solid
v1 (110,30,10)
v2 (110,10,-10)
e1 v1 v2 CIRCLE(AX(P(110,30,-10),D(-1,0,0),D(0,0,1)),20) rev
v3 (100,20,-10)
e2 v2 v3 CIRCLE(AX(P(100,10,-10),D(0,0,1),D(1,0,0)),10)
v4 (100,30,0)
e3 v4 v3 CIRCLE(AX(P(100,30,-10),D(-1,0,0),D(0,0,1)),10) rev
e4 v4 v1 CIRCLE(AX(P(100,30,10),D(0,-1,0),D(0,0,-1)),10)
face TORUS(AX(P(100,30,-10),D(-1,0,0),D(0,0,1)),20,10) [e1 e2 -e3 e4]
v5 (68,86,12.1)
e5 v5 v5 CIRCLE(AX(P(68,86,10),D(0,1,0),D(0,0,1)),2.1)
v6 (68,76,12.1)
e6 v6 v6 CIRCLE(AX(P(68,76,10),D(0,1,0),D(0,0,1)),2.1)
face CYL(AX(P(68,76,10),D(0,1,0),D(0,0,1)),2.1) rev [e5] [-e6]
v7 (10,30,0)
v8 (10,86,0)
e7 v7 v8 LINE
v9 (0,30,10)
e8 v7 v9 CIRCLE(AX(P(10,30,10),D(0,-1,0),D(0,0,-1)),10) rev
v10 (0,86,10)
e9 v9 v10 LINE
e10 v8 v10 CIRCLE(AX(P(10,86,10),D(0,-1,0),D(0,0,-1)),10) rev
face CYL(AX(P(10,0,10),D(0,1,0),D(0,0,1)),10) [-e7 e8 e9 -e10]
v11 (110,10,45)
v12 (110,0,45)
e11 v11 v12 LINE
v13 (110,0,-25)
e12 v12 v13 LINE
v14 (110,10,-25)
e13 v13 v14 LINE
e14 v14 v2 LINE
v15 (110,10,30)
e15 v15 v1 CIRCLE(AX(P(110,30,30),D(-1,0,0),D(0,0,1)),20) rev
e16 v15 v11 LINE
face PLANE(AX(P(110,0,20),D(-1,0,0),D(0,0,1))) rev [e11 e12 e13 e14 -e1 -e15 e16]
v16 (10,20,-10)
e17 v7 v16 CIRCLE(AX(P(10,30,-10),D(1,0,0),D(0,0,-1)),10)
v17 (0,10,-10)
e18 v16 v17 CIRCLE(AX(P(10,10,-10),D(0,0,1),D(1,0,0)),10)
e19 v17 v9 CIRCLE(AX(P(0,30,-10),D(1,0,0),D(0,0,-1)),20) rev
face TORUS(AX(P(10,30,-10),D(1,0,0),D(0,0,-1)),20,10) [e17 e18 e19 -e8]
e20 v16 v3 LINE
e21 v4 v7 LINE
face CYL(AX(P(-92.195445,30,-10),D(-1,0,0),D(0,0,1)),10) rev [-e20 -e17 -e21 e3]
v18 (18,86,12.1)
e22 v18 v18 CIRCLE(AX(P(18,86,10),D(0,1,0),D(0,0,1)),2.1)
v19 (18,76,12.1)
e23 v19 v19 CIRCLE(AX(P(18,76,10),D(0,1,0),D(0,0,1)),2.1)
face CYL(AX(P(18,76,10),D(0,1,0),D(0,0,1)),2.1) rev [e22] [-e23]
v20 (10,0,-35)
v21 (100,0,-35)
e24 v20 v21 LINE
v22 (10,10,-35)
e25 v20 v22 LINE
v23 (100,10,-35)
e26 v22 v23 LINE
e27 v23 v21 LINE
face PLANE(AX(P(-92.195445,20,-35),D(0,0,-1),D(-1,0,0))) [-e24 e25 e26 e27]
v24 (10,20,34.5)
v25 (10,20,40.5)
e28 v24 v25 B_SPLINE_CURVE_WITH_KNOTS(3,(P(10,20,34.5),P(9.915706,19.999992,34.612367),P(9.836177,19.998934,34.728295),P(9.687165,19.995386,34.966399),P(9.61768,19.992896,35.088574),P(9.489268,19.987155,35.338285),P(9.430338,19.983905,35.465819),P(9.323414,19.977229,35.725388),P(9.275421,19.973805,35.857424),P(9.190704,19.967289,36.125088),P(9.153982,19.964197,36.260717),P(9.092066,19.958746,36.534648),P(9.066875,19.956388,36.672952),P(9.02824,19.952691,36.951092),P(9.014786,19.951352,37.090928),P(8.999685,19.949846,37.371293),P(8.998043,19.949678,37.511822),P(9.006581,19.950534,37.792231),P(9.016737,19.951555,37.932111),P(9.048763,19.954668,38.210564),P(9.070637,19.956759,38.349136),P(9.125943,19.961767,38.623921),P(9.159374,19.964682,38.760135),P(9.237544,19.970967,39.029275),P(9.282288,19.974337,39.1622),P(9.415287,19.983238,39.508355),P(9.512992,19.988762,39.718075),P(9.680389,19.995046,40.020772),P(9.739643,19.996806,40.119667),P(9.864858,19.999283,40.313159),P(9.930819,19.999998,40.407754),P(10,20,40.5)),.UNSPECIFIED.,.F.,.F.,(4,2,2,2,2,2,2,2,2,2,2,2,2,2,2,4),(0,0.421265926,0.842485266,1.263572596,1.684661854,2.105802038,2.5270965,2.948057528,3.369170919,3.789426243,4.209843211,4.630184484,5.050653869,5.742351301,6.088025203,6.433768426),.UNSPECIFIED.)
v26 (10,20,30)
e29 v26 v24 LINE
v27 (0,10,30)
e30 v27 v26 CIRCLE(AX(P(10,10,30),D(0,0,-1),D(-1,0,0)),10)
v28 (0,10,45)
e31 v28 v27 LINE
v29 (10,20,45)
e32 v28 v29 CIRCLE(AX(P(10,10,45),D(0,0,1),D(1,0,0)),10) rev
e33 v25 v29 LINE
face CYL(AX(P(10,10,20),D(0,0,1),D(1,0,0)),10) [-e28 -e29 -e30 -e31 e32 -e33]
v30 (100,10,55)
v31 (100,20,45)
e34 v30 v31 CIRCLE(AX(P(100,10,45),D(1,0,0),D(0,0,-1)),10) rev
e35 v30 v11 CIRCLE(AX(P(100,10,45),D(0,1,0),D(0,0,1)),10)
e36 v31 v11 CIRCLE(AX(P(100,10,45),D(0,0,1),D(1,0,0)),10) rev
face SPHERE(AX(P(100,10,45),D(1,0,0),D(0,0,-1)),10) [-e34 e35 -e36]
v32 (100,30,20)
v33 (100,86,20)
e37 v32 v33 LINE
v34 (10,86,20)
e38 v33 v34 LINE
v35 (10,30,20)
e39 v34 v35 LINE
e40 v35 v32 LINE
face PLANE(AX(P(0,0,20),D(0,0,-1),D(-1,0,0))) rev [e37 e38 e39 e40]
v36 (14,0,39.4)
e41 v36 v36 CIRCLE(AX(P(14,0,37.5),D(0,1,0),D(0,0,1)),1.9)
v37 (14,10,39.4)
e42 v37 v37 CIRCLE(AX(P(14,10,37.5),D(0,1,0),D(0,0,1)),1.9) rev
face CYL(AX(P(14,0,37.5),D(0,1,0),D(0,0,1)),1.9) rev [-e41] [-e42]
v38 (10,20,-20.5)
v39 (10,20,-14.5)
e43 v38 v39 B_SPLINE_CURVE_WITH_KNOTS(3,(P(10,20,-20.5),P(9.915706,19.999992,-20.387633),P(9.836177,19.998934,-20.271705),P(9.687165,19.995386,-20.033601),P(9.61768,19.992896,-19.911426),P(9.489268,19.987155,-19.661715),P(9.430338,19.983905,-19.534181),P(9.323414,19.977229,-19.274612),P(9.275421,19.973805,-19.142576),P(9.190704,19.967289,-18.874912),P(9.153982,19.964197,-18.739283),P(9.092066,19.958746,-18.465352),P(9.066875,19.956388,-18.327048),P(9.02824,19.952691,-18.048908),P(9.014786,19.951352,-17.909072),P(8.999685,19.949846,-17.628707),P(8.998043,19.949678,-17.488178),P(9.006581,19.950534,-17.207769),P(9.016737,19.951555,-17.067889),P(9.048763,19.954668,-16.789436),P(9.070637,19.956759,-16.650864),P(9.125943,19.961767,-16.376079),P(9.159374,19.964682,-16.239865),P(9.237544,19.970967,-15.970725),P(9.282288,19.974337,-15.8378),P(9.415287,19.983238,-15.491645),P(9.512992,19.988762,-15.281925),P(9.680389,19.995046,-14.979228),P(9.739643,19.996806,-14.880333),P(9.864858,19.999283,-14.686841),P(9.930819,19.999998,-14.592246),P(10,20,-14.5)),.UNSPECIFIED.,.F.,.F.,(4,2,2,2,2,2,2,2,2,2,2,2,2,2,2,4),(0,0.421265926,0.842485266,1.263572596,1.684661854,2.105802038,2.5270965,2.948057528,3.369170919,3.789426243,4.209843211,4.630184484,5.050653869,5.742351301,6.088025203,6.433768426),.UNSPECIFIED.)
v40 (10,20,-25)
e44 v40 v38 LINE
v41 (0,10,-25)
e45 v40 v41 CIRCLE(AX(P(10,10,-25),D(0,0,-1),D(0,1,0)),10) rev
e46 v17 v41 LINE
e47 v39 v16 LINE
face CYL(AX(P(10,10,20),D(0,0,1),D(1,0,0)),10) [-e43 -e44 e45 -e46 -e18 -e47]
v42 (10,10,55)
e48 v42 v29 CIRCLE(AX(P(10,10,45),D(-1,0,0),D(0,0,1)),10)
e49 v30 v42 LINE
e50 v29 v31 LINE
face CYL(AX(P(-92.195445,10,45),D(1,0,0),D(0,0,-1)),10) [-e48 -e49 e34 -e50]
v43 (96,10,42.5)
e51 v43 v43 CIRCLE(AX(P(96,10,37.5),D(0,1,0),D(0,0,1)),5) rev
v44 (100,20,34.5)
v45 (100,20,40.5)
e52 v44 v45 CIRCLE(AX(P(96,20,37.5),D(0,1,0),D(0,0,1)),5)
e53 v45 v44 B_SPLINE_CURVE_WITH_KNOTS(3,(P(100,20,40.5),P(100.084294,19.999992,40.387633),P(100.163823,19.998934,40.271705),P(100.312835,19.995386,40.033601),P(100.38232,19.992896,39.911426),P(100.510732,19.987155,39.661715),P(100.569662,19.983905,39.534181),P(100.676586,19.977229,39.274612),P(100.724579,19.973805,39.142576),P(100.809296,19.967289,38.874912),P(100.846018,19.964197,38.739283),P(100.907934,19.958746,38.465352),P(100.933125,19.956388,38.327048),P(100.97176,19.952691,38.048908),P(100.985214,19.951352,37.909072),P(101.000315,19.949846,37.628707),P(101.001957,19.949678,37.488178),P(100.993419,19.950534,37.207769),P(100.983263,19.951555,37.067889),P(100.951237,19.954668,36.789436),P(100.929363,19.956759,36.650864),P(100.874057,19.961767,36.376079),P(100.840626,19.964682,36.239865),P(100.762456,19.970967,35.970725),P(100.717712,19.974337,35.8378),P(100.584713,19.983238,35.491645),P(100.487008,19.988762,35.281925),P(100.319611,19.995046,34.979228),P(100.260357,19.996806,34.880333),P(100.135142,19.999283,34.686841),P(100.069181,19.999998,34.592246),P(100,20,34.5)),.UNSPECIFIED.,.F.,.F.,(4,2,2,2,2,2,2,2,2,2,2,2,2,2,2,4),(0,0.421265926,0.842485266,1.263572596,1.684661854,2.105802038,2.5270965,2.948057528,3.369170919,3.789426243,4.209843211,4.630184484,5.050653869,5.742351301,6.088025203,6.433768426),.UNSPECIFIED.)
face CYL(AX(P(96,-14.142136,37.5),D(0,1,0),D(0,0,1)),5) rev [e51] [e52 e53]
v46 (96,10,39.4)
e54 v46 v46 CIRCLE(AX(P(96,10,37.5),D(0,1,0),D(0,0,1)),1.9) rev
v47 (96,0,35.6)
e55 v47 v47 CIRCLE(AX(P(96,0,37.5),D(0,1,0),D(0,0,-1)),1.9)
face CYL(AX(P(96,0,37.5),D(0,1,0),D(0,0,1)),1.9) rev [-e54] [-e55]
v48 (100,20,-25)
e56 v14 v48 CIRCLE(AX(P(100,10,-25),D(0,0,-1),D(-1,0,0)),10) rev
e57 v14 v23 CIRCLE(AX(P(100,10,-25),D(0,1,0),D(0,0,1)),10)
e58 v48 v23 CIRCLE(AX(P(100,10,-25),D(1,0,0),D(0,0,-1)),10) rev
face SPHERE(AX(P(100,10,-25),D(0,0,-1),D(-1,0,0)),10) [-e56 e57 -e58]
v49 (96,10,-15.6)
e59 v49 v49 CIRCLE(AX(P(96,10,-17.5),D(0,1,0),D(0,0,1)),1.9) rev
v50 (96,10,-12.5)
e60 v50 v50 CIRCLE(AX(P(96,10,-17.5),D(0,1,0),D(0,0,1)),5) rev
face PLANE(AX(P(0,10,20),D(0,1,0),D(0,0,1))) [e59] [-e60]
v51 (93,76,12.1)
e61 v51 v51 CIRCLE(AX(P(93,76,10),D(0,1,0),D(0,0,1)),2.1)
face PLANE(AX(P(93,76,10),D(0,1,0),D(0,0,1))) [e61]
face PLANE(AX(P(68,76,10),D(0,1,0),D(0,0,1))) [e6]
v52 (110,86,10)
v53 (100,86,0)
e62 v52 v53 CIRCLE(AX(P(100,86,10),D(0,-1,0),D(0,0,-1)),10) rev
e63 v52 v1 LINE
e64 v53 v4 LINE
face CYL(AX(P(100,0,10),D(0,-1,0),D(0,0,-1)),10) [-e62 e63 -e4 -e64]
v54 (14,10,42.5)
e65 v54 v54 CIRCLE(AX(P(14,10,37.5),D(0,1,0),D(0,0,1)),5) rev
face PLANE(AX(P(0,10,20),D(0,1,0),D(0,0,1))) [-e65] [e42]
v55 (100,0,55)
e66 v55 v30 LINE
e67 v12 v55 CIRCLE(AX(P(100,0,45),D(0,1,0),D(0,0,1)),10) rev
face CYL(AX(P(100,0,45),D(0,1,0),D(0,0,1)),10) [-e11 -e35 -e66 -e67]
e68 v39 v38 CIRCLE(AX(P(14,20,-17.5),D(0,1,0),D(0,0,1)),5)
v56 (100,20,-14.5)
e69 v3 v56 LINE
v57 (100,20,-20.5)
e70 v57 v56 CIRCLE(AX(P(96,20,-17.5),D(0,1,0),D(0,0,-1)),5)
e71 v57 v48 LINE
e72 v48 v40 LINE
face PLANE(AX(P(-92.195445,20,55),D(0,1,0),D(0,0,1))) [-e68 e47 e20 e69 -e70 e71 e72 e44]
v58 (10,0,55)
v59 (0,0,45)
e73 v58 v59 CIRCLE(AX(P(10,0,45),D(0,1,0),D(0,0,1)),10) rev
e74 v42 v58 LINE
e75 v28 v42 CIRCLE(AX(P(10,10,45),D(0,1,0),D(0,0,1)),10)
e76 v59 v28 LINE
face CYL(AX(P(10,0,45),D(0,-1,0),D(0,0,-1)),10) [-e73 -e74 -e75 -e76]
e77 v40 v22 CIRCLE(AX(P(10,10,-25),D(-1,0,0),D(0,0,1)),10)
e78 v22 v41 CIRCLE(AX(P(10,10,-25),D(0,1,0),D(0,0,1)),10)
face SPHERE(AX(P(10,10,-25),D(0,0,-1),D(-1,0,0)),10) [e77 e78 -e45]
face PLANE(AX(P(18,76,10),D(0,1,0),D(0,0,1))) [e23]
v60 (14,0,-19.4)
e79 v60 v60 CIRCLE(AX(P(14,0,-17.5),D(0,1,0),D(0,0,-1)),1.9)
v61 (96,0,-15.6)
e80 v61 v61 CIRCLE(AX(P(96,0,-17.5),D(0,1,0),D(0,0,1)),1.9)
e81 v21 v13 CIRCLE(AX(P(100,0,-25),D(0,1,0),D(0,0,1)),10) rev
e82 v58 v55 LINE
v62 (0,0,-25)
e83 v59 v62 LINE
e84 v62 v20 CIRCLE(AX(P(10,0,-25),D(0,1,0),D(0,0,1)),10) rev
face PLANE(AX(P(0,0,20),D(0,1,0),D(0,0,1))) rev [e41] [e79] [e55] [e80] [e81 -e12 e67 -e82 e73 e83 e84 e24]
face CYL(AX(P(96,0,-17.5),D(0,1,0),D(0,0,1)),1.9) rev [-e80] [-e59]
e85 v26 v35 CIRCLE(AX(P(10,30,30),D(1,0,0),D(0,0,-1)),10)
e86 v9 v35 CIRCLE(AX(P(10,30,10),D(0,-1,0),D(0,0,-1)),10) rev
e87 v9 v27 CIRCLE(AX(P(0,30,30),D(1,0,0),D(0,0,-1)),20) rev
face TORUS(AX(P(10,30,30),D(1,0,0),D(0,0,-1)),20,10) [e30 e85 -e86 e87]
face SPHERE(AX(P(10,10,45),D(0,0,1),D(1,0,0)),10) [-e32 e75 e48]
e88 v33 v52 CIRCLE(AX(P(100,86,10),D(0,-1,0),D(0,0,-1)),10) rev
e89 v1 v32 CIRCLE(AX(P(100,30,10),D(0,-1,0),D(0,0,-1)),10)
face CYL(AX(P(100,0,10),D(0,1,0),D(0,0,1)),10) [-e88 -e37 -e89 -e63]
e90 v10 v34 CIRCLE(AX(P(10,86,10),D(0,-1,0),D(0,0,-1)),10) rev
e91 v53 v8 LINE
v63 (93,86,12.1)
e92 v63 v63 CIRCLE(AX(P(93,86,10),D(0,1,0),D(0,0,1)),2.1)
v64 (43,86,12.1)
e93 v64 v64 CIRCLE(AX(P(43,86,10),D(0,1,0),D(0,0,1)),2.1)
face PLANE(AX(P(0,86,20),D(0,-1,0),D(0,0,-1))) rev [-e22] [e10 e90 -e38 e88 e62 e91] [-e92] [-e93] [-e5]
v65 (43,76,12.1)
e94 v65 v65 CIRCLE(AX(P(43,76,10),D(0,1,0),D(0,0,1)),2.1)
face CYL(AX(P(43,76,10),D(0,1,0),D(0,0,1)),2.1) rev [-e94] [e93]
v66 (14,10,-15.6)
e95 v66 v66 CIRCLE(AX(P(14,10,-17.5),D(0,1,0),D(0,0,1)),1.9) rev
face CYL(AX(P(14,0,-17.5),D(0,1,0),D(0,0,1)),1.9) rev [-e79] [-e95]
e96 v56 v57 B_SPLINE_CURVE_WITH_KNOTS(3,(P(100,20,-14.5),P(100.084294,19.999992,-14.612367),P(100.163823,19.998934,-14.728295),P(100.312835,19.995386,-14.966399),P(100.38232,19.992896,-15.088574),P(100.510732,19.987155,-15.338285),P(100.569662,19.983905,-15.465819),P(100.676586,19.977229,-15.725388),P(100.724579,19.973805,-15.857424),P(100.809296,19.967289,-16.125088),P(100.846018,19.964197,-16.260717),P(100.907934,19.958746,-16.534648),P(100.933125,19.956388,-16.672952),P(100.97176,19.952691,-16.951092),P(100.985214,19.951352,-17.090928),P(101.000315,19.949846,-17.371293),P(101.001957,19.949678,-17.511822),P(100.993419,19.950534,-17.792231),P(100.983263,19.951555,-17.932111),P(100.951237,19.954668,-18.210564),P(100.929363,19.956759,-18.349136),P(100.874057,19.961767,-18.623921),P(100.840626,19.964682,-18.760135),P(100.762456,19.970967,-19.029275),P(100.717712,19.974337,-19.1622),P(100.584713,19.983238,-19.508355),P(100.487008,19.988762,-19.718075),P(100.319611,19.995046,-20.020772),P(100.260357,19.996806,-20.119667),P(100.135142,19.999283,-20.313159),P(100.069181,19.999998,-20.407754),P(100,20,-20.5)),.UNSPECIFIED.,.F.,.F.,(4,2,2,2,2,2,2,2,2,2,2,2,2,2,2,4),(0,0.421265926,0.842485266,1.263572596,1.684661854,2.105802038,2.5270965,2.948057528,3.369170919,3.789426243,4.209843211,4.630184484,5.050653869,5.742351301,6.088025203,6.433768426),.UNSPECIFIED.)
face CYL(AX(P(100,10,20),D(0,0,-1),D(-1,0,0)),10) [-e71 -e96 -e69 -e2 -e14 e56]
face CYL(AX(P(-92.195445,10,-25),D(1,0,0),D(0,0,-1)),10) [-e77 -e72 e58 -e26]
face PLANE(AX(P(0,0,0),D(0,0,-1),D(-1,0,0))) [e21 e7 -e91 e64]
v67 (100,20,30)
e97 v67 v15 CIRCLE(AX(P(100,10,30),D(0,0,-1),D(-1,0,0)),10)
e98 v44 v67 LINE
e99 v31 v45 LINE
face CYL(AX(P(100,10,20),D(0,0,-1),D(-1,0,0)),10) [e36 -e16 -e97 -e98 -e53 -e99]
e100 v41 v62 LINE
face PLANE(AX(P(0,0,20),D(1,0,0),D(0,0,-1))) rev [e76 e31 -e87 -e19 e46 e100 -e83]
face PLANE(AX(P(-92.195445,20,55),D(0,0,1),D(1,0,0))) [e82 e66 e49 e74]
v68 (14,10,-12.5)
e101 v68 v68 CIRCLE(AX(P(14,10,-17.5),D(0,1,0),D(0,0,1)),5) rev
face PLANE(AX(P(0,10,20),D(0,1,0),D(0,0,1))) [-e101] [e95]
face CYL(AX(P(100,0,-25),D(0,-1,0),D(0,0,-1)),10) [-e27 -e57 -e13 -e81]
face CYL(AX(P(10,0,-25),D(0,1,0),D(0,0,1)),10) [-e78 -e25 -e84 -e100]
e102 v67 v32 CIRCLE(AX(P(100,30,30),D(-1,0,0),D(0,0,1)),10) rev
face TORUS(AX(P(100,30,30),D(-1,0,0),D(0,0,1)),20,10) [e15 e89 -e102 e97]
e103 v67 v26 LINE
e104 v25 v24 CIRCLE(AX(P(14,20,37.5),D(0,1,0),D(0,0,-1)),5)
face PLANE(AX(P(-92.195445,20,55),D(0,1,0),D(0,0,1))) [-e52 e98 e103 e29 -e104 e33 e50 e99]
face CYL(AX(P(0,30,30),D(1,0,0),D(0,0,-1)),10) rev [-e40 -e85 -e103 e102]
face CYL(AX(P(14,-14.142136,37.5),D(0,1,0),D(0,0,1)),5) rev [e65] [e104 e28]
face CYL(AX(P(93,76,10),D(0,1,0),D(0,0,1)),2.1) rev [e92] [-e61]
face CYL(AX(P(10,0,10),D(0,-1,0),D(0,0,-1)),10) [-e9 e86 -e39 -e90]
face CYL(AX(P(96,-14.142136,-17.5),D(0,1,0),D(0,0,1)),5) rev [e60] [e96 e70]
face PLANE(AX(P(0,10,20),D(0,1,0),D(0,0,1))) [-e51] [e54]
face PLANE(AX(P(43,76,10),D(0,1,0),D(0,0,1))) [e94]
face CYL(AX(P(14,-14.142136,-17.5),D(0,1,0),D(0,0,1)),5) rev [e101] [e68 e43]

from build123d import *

# Parameters (mm, degrees)
SKETCH2_W           = 110
SKETCH2_H           = 86
BOSS_EXTRUDE1_DEPTH = 20
SKETCH3_W           = 90
SKETCH3_H           = 20
BOSS_EXTRUDE2_DEPTH = 110
SKETCH4_R           = 1.9
CUT_EXTRUDE1_DEPTH  = 20
SKETCH5_R           = 5
CUT_EXTRUDE2_DEPTH  = 10
FILLET1_R           = 10
SKETCH6_R           = 2.1
CUT_EXTRUDE3_DEPTH  = 10


with BuildPart() as part:
    # Sketch2 → Boss-Extrude1 (new body)
    with BuildSketch(Plane.XY):
        with Locations((55, 43)):
            Rectangle(SKETCH2_W, SKETCH2_H)
    extrude(amount=BOSS_EXTRUDE1_DEPTH)

    # Sketch3 → Boss-Extrude2 (add)
    with BuildSketch(Plane(origin=(110, 0, 0), x_dir=(0, 0, -1), z_dir=(1, 0, 0))):
        with Locations((-10, 10)):
            Rectangle(SKETCH3_W, SKETCH3_H)
    extrude(amount=-BOSS_EXTRUDE2_DEPTH)

    # Sketch4 → Cut-Extrude1 (cut)
    with BuildSketch(Plane(origin=(0, 20, 0), x_dir=(1, 0, 0), z_dir=(0, 1, 0))):
        with Locations(Location((14, -37.5, 0), (0, 0, 270))):
            Circle(SKETCH4_R)
        with Locations(Location((96, -37.5, 0), (0, 0, 90))):
            Circle(SKETCH4_R)
        with Locations(Location((96, 17.5, 0), (0, 0, 270))):
            Circle(SKETCH4_R)
        with Locations(Location((14, 17.5, 0), (0, 0, 90))):
            Circle(SKETCH4_R)
    extrude(amount=-CUT_EXTRUDE1_DEPTH, mode=Mode.SUBTRACT)

    # Sketch5 → Cut-Extrude2 (cut)
    with BuildSketch(Plane(origin=(0, 20, 0), x_dir=(1, 0, 0), z_dir=(0, 1, 0))):
        with Locations(Location((96, -37.5, 0), (0, 0, 270))):
            Circle(SKETCH5_R)
        with Locations(Location((14, -37.5, 0), (0, 0, 270))):
            Circle(SKETCH5_R)
        with Locations(Location((14, 17.5, 0), (0, 0, 270))):
            Circle(SKETCH5_R)
        with Locations(Location((96, 17.5, 0), (0, 0, 270))):
            Circle(SKETCH5_R)
    extrude(amount=-CUT_EXTRUDE2_DEPTH, mode=Mode.SUBTRACT)

    # Fillet1
    # the kernel refuses this fillet: 10 mm, written as the material it adds along each edge
    with BuildSketch(Plane(origin=(0, 20, 0), x_dir=(0, 0, -1), z_dir=(1, 0, 0)), Plane(origin=(0, 20, 20), x_dir=(0, 1, 0), z_dir=(1, 0, 0))) as fillet1_piece_1:
        with BuildLine():
            CenterArc((FILLET1_R, FILLET1_R), FILLET1_R, 180, 90)
            Line((0, FILLET1_R), (0, 0))
            Line((0, 0), (FILLET1_R, 0))
        make_face()
    extrude(amount=110)
    # the kernel refuses this fillet: 10 mm, written as the material it takes off along each edge
    with BuildSketch(Plane(origin=(0, 45, -35), x_dir=(0, 0, 1), z_dir=(0, -1, 0)), Plane(origin=(110, 45, -35), x_dir=(-1, 0, 0), z_dir=(0, -1, 0)), Plane(origin=(0, -25, 55), x_dir=(0, 0, -1), z_dir=(0, 1, 0)), Plane(origin=(110, -25, 55), x_dir=(-1, 0, 0), z_dir=(0, 1, 0))) as fillet1_2_piece_1:
        with BuildLine():
            CenterArc((FILLET1_R, -FILLET1_R), FILLET1_R, 90, 90)
            Line((0, -FILLET1_R), (0, 0))
            Line((0, 0), (FILLET1_R, 0))
        make_face()
    extrude(amount=70, mode=Mode.SUBTRACT)
    with BuildSketch(Plane(origin=(135, 20, -35), x_dir=(0, -1, 0), z_dir=(-1, 0, 0))) as fillet1_2_piece_2:
        with BuildLine():
            CenterArc((FILLET1_R, FILLET1_R), FILLET1_R, 180, 90)
            Line((0, FILLET1_R), (0, 0))
            Line((0, 0), (FILLET1_R, 0))
        make_face()
    extrude(amount=160, mode=Mode.SUBTRACT)
    with BuildSketch(Plane(origin=(135, 20, 55), x_dir=(0, -1, 0), z_dir=(-1, 0, 0))) as fillet1_2_piece_3:
        with BuildLine():
            CenterArc((FILLET1_R, -FILLET1_R), FILLET1_R, 90, 90)
            Line((0, -FILLET1_R), (0, 0))
            Line((0, 0), (FILLET1_R, 0))
        make_face()
    extrude(amount=160, mode=Mode.SUBTRACT)
    # the kernel refuses this fillet: 10 mm, written as the material it takes off along each edge
    with BuildSketch(Plane(origin=(100, 10, 45), x_dir=(0, 1, 0), z_dir=(1, 0, 0))) as fillet1_3_piece_1_section:
        Polygon((0, 0), (FILLET1_R, 0), (FILLET1_R, FILLET1_R), (0, FILLET1_R), align=None)
    fillet1_3_piece_1 = extrude(amount=FILLET1_R, mode=Mode.PRIVATE)
    fillet1_3_piece_1 = fillet1_3_piece_1 - Plane(origin=(100, 10, 45), x_dir=(0, -0.7071067811865475, -0.7071067811865475), z_dir=(1, 0, 0)) * Sphere(FILLET1_R, mode=Mode.PRIVATE)
    add(fillet1_3_piece_1, mode=Mode.SUBTRACT)
    with BuildSketch(Plane(origin=(10, 10, 45), x_dir=(0, 1, 0), z_dir=(-1, 0, 0))) as fillet1_3_piece_2_section:
        Polygon((0, 0), (FILLET1_R, 0), (FILLET1_R, -FILLET1_R), (0, -FILLET1_R), align=None)
    fillet1_3_piece_2 = extrude(amount=FILLET1_R, mode=Mode.PRIVATE)
    fillet1_3_piece_2 = fillet1_3_piece_2 - Plane(origin=(10, 10, 45), x_dir=(0, -0.7071067811865475, -0.7071067811865475), z_dir=(-1, 0, 0)) * Sphere(FILLET1_R, mode=Mode.PRIVATE)
    add(fillet1_3_piece_2, mode=Mode.SUBTRACT)
    with BuildSketch(Plane(origin=(10, 10, -25), x_dir=(0, 1, 0), z_dir=(-1, 0, 0))) as fillet1_3_piece_3_section:
        Polygon((0, 0), (FILLET1_R, 0), (FILLET1_R, FILLET1_R), (0, FILLET1_R), align=None)
    fillet1_3_piece_3 = extrude(amount=FILLET1_R, mode=Mode.PRIVATE)
    fillet1_3_piece_3 = fillet1_3_piece_3 - Plane(origin=(10, 10, -25), x_dir=(0, -0.7071067811865475, 0.7071067811865475), z_dir=(-1, 0, 0)) * Sphere(FILLET1_R, mode=Mode.PRIVATE)
    add(fillet1_3_piece_3, mode=Mode.SUBTRACT)
    with BuildSketch(Plane(origin=(100, 10, -25), x_dir=(0, 1, 0), z_dir=(1, 0, 0))) as fillet1_3_piece_4_section:
        Polygon((0, 0), (FILLET1_R, 0), (FILLET1_R, -FILLET1_R), (0, -FILLET1_R), align=None)
    fillet1_3_piece_4 = extrude(amount=FILLET1_R, mode=Mode.PRIVATE)
    fillet1_3_piece_4 = fillet1_3_piece_4 - Plane(origin=(100, 10, -25), x_dir=(0, -0.7071067811865475, 0.7071067811865475), z_dir=(1, 0, 0)) * Sphere(FILLET1_R, mode=Mode.PRIVATE)
    add(fillet1_3_piece_4, mode=Mode.SUBTRACT)
    with BuildSketch(Plane(origin=(0, 111, 0), x_dir=(0, 0, 1), z_dir=(0, -1, 0)), Plane(origin=(110, 30, 0), x_dir=(0, 0, 1), z_dir=(0, 1, 0))) as fillet1_3_piece_5:
        with BuildLine():
            CenterArc((FILLET1_R, -FILLET1_R), FILLET1_R, 90, 90)
            Line((0, -FILLET1_R), (0, 0))
            Line((0, 0), (FILLET1_R, 0))
        make_face()
    extrude(amount=81, mode=Mode.SUBTRACT)
    with BuildSketch(Plane(origin=(0, 111, 20), x_dir=(0, 0, -1), z_dir=(0, -1, 0)), Plane(origin=(110, 30, 20), x_dir=(0, 0, -1), z_dir=(0, 1, 0))) as fillet1_3_piece_6:
        with BuildLine():
            CenterArc((FILLET1_R, FILLET1_R), FILLET1_R, 180, 90)
            Line((0, FILLET1_R), (0, 0))
            Line((0, 0), (FILLET1_R, 0))
        make_face()
    extrude(amount=81, mode=Mode.SUBTRACT)
    with BuildSketch(Plane(origin=(110, 20, -10), x_dir=(0, -1, 0), z_dir=(0, 0, -1)), Plane(origin=(110, 20, 45), x_dir=(0, -1, 0), z_dir=(0, 0, -1))) as fillet1_3_piece_7:
        with BuildLine():
            CenterArc((FILLET1_R, FILLET1_R), FILLET1_R, 180, 90)
            Line((0, FILLET1_R), (0, 0))
            Line((0, 0), (FILLET1_R, 0))
        make_face()
    extrude(amount=15, mode=Mode.SUBTRACT)
    with BuildSketch(Plane(origin=(0, 20, -10), x_dir=(0, -1, 0), z_dir=(0, 0, -1)), Plane(origin=(0, 20, 45), x_dir=(0, -1, 0), z_dir=(0, 0, -1))) as fillet1_3_piece_8:
        with BuildLine():
            CenterArc((FILLET1_R, -FILLET1_R), FILLET1_R, 90, 90)
            Line((0, -FILLET1_R), (0, 0))
            Line((0, 0), (FILLET1_R, 0))
        make_face()
    extrude(amount=15, mode=Mode.SUBTRACT)
    with BuildSketch(Plane(origin=(110, 30, 30), x_dir=(0, 0, -1), z_dir=(0, 1, 0))) as fillet1_3_piece_9:
        with BuildLine():
            CenterArc((10 + FILLET1_R, FILLET1_R), FILLET1_R, 180, 90)
            Line((10, FILLET1_R), (10, 0))
            Line((10, 0), (10 + FILLET1_R, 0))
        make_face()
    revolve(axis=Axis((110, 30, 30), (-1, 0, 0)), revolution_arc=90, mode=Mode.SUBTRACT)
    with BuildSketch(Plane(origin=(0, 30, 30), x_dir=(0, 0, -1), z_dir=(0, 1, 0))) as fillet1_3_piece_10:
        with BuildLine():
            CenterArc((10 + FILLET1_R, -FILLET1_R), FILLET1_R, 90, 90)
            Line((10, -FILLET1_R), (10, 0))
            Line((10, 0), (10 + FILLET1_R, 0))
        make_face()
    revolve(axis=Axis((0, 30, 30), (-1, 0, 0)), revolution_arc=90, mode=Mode.SUBTRACT)
    with BuildSketch(Plane(origin=(0, 30, -10), x_dir=(0, -1, 0), z_dir=(0, 0, -1))) as fillet1_3_piece_11:
        with BuildLine():
            CenterArc((10 + FILLET1_R, -FILLET1_R), FILLET1_R, 90, 90)
            Line((10, -FILLET1_R), (10, 0))
            Line((10, 0), (10 + FILLET1_R, 0))
        make_face()
    revolve(axis=Axis((0, 30, -10), (-1, 0, 0)), revolution_arc=90, mode=Mode.SUBTRACT)
    with BuildSketch(Plane(origin=(110, 30, -10), x_dir=(0, -1, 0), z_dir=(0, 0, -1))) as fillet1_3_piece_12:
        with BuildLine():
            CenterArc((10 + FILLET1_R, FILLET1_R), FILLET1_R, 180, 90)
            Line((10, FILLET1_R), (10, 0))
            Line((10, 0), (10 + FILLET1_R, 0))
        make_face()
    revolve(axis=Axis((110, 30, -10), (-1, 0, 0)), revolution_arc=90, mode=Mode.SUBTRACT)

    # Sketch6 → Cut-Extrude3 (cut)
    with BuildSketch(Plane(origin=(0, 86, 0), x_dir=(1, 0, 0), z_dir=(0, 1, 0))):
        with Locations(Location((18, -10, 0), (0, 0, 270))):
            Circle(SKETCH6_R)
        with Locations(Location((43, -10, 0), (0, 0, 270))):
            Circle(SKETCH6_R)
        with Locations(Location((68, -10, 0), (0, 0, 270))):
            Circle(SKETCH6_R)
        with Locations(Location((93, -10, 0), (0, 0, 270))):
            Circle(SKETCH6_R)
    extrude(amount=-CUT_EXTRUDE3_DEPTH, mode=Mode.SUBTRACT)


solid = part.part
